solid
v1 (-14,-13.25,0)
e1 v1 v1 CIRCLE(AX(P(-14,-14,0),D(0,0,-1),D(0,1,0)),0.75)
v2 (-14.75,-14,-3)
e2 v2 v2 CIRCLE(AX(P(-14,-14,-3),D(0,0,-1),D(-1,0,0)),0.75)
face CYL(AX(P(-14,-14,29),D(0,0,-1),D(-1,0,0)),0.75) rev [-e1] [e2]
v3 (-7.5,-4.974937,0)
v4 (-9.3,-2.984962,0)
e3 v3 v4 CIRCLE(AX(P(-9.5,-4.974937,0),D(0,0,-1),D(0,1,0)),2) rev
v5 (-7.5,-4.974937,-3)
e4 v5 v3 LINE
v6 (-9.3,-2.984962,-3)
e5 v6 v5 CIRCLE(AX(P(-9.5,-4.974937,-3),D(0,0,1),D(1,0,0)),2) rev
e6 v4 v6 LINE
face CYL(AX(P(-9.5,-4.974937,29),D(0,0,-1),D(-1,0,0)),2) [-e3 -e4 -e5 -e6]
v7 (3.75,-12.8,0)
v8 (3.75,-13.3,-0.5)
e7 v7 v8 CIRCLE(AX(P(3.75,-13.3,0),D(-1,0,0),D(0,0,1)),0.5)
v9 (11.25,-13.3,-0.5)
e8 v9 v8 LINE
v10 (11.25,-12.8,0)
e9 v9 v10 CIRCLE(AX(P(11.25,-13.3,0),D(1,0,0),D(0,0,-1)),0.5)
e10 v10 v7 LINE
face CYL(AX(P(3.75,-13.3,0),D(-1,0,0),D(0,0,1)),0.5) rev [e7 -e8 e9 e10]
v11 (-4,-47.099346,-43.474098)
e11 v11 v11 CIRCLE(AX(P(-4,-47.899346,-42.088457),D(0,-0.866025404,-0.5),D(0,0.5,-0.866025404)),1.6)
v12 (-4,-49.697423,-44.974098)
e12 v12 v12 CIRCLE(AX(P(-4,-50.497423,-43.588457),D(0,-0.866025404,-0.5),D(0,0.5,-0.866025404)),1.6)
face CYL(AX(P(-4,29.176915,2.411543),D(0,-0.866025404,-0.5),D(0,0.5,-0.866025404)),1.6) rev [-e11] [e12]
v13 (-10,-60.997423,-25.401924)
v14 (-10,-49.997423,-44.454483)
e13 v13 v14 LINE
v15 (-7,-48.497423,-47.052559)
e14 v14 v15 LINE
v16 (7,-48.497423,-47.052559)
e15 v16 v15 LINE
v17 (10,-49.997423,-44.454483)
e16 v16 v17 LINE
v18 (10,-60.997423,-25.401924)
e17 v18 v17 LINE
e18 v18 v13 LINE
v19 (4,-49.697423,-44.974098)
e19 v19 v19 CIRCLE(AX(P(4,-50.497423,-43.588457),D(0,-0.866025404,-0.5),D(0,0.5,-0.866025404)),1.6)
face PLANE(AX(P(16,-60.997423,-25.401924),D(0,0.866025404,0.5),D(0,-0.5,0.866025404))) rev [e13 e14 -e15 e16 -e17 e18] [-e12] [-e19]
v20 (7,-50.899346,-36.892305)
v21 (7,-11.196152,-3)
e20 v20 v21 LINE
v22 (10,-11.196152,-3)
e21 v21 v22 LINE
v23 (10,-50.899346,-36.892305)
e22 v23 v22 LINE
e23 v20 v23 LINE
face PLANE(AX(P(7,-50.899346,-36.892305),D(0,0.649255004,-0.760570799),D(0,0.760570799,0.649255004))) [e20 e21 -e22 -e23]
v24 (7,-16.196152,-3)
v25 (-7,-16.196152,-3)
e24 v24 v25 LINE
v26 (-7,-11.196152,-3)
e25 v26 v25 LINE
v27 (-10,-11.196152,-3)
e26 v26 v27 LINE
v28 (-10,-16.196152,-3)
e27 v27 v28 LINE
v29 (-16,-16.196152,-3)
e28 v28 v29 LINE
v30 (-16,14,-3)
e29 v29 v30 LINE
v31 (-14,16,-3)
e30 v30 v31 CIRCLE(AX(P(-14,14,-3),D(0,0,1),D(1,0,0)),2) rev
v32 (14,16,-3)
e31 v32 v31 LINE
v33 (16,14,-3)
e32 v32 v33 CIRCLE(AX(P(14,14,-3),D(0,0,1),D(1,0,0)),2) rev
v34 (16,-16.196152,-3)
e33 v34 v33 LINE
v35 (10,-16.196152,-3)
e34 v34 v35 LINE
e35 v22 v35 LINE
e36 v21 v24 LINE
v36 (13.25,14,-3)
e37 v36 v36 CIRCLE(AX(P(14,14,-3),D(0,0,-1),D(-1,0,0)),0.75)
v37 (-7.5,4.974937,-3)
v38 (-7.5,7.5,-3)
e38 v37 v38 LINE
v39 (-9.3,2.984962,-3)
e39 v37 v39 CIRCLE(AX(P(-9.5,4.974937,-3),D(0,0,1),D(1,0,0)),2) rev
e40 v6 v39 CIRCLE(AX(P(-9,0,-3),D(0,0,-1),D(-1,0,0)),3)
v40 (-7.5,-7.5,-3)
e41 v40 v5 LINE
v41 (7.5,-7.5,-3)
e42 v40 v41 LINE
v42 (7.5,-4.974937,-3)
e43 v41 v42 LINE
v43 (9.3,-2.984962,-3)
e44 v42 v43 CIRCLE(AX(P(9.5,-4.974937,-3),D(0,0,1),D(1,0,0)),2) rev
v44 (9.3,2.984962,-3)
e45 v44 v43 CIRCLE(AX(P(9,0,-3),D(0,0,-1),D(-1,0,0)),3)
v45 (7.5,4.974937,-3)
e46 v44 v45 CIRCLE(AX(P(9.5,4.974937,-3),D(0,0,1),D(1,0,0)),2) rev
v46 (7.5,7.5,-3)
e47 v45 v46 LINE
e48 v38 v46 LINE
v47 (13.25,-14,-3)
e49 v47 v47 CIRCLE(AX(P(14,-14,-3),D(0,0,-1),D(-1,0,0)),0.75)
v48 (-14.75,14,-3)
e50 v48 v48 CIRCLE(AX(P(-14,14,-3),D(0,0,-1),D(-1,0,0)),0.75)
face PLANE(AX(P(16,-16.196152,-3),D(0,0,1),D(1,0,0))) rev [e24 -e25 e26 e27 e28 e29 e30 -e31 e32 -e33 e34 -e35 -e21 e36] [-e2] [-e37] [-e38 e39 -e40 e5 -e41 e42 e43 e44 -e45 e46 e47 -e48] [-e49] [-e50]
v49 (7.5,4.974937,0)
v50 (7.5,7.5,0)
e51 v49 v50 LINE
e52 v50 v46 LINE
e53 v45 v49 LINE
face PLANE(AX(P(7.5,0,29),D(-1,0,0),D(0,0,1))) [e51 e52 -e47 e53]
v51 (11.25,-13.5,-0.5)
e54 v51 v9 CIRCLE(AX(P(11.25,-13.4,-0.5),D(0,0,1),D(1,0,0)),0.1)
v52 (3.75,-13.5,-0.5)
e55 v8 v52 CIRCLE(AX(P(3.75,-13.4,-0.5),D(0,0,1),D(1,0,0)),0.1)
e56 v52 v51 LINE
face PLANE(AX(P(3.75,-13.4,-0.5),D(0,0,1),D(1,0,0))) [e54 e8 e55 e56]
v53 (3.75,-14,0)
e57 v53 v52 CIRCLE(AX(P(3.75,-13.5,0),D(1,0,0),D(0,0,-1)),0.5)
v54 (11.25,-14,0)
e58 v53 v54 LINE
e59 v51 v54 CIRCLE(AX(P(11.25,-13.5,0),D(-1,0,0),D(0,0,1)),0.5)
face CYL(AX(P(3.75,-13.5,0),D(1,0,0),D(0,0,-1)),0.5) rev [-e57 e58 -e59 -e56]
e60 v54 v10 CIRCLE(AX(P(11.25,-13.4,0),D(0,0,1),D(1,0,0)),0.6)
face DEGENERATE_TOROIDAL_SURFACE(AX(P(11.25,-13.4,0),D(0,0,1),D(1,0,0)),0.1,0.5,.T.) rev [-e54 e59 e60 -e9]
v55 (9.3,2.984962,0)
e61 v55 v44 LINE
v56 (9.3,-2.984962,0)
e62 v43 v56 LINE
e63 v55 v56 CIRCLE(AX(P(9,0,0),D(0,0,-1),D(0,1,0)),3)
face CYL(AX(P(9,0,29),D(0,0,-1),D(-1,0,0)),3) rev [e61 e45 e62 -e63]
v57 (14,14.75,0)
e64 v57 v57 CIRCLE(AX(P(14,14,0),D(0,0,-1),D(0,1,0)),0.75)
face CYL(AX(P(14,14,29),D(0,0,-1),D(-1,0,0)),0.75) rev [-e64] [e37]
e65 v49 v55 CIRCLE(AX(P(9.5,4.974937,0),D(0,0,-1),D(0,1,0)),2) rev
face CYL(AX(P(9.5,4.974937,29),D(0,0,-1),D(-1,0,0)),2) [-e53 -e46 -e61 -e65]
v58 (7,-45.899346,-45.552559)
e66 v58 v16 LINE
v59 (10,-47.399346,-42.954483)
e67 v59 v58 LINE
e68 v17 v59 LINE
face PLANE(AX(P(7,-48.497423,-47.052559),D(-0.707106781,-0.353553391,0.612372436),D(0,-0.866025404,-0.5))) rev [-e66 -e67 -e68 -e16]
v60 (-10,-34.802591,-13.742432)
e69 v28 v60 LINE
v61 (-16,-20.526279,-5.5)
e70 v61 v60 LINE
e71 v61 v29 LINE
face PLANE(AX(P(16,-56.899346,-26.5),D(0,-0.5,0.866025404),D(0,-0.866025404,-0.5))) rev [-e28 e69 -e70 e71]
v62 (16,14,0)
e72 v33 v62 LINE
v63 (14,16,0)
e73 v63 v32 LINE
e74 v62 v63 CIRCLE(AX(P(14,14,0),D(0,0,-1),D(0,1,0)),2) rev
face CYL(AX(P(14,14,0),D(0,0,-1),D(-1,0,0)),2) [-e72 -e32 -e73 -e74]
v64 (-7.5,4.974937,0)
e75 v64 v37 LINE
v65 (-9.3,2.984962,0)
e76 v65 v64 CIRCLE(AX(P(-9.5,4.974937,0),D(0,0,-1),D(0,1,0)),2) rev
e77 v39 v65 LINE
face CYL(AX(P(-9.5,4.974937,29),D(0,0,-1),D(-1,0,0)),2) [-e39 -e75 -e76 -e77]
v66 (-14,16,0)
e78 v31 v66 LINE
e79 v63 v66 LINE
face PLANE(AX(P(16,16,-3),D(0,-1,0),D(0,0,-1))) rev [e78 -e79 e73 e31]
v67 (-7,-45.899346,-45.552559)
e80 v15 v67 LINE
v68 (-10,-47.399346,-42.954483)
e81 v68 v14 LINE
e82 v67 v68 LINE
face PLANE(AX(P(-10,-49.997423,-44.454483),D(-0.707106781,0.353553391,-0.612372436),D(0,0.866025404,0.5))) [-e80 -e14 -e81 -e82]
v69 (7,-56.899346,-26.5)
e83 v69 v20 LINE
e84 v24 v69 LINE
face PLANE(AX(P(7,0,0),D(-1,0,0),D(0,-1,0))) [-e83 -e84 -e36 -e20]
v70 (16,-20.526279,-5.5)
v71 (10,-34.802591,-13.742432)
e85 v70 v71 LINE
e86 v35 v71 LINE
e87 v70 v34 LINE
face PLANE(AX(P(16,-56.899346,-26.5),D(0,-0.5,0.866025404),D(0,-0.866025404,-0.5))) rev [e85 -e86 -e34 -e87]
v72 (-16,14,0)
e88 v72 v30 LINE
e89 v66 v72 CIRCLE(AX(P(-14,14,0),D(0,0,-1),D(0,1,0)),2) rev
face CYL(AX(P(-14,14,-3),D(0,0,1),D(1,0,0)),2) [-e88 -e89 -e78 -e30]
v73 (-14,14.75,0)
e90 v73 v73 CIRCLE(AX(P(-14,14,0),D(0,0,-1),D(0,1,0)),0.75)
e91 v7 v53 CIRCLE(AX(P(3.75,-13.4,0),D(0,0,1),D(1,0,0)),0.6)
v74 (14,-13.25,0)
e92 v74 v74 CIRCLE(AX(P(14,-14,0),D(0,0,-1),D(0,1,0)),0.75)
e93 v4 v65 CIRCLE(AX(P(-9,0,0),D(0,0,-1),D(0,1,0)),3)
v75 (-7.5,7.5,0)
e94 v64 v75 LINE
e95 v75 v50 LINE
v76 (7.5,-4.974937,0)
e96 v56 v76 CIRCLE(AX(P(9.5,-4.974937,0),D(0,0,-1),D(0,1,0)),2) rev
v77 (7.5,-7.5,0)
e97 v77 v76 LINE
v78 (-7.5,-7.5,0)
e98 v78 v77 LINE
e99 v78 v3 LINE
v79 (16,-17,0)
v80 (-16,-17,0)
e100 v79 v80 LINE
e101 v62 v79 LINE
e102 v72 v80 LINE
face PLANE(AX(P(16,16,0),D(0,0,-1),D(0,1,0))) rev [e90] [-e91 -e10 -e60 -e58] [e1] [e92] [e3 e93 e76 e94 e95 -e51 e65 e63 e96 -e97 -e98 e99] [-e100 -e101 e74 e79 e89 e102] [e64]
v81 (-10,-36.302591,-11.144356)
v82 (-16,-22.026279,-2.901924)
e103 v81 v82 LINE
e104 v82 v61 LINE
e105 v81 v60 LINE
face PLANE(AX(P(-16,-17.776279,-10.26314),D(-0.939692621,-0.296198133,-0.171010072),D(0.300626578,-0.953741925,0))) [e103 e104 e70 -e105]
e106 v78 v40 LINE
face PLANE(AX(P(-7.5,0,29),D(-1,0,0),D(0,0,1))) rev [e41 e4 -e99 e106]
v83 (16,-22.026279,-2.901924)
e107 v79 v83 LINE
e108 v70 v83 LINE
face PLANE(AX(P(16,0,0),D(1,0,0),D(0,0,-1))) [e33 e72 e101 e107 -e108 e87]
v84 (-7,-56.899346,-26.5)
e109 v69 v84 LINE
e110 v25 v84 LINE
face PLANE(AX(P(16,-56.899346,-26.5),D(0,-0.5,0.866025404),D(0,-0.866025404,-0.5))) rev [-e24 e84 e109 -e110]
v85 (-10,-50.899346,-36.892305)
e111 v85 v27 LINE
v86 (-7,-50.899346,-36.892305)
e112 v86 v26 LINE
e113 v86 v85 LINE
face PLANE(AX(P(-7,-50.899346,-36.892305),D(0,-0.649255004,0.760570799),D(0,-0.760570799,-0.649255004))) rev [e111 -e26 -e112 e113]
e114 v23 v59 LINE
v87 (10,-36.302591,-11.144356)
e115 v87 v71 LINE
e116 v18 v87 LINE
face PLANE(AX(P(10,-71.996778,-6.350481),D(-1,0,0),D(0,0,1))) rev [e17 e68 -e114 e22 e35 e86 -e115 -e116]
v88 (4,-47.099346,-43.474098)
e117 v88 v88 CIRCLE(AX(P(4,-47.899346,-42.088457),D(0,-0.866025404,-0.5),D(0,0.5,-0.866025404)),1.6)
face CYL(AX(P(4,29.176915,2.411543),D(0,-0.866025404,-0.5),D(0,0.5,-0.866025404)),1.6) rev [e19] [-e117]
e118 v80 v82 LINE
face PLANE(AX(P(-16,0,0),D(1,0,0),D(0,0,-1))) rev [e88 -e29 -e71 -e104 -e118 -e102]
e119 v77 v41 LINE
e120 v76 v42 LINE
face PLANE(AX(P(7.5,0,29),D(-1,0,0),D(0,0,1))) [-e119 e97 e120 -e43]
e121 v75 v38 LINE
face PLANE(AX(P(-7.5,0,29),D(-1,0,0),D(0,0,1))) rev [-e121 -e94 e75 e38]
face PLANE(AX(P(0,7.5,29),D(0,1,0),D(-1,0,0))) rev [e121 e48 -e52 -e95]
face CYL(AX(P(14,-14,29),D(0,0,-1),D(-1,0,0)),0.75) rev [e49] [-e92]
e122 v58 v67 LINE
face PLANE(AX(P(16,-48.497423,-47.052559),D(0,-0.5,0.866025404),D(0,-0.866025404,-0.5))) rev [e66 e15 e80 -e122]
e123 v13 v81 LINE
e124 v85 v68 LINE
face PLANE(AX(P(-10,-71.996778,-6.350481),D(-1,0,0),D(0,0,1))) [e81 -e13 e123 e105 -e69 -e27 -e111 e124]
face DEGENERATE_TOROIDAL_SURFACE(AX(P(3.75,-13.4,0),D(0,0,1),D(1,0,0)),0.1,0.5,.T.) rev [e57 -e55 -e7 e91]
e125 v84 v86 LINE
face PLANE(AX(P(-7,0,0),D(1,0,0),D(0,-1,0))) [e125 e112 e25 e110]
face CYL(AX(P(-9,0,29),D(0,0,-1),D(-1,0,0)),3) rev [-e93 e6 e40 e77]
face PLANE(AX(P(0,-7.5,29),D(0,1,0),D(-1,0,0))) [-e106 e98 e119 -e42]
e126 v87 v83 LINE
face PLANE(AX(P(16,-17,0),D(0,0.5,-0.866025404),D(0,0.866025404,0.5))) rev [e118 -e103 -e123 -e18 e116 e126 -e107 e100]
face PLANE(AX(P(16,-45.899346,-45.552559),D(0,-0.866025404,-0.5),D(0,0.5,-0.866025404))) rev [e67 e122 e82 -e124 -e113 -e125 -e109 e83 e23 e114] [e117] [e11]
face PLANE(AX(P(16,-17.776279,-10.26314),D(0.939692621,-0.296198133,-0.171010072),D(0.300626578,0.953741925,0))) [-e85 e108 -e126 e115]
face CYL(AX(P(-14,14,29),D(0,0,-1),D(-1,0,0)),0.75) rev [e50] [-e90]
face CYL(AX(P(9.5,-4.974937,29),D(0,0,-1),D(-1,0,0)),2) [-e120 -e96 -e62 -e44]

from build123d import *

# Parameters (mm, degrees)
BOSS_EXTRUDE1_DEPTH = 16
FILLET1_R           = 2
SKETCH2_W           = 15
SKETCH2_H           = 4.5
SKETCH2_H_2         = 6
SKETCH2_R           = 0.75
CUT_EXTRUDE1_DEPTH  = 32
SKETCH4_R           = 1.6
CUT_EXTRUDE2_DEPTH  = 92
CUT_EXTRUDE4_DEPTH  = 80.584099309
BOSS_EXTRUDE2_DEPTH = 3
DRAFT1_ANGLE        = 70
DRAFT2_START        = -8.5
DRAFT2_DEPTH        = 3
CUT_EXTRUDE5_DEPTH  = 0.5
FILLET4_R           = 0.5
FILLET3_R           = 2
CHAMFER1_SIZE       = 3


# Read off the part's stored shape, not the designer's step: Draft2
with BuildPart() as part:
    # Sketch1 → Boss-Extrude1 (new, symmetric)
    with BuildSketch(Plane(origin=(0, 0, 0), x_dir=(0, 0, -1), z_dir=(1, 0, 0))):
        Polygon((0, 16), (0, -17), (25.401923789, -60.997422612), (47.052558883, -48.497422612), (45.552558883, -45.899346401), (26.5, -56.899346401), (3, -16.196152423), (3, 16), align=None)
    extrude(amount=BOSS_EXTRUDE1_DEPTH, both=True)

    # Fillet1
    fillet1_edges = [part.edges().sort_by_distance(p)[0] for p in [
        (-16, 16, -1.5),
        (16, 16, -1.5),
    ]]
    fillet(fillet1_edges, radius=FILLET1_R)

    # Sketch2 → Cut-Extrude1 (cut)
    with BuildSketch(Plane(origin=(0, 0, -3), x_dir=(-1, 0, 0), z_dir=(0, 0, -1))):
        with Locations((0, 5.25)):
            Rectangle(SKETCH2_W, SKETCH2_H)
        Rectangle(SKETCH2_W, SKETCH2_H_2)
        with BuildLine():
            Line((-9, -3), (-7.5, -3))
            Line((-7.5, -3), (-7.5, 3))
            Line((-7.5, 3), (-9, 3))
            ThreePointArc((-9, 3), (-12, 0), (-9, -3))
        make_face()
        with Locations((0, -5.25)):
            Rectangle(SKETCH2_W, SKETCH2_H)
        with BuildLine():
            Line((7.5, 3), (7.5, -3))
            Line((7.5, -3), (9, -3))
            ThreePointArc((9, -3), (12, 0), (9, 3))
            Line((9, 3), (7.5, 3))
        make_face()
        with Locations((14, -14)):
            Circle(SKETCH2_R)
        with Locations((-14, -14)):
            Circle(SKETCH2_R)
        with Locations((-14, 14)):
            Circle(SKETCH2_R)
        with Locations((14, 14)):
            Circle(SKETCH2_R)
    extrude(amount=-CUT_EXTRUDE1_DEPTH, mode=Mode.SUBTRACT)

    # Sketch4 → Cut-Extrude2 (cut)
    with BuildSketch(Plane(origin=(0, -56.747422612, -32.763139721), x_dir=(1, 0, 0), z_dir=(0, -0.8660254037844379, -0.5000000000000014))):
        with Locations(Location((-4, -12.5, 0), (0, 0, 270))):
            Circle(SKETCH4_R)
        with Locations(Location((4, -12.5, 0), (0, 0, 270))):
            Circle(SKETCH4_R)
    extrude(amount=-CUT_EXTRUDE2_DEPTH, mode=Mode.SUBTRACT)

    # Sketch7 → Cut-Extrude4 (cut, symmetric)
    with BuildSketch(Plane(origin=(0, -2.75, 4.763139721), x_dir=(-1, 0, 0), z_dir=(0, 0.500000000000002, -0.8660254037844375))):
        Polygon((-10, -65.526279442), (-10, -26.526279442), (-16, -20.526279442), (-16, -65.526279442), align=None)
    cut_extrude4 = extrude(amount=CUT_EXTRUDE4_DEPTH, both=True, mode=Mode.SUBTRACT)

    # Sketch5 → Boss-Extrude2 (add)
    with BuildSketch(Plane(origin=(10, 0, 0), x_dir=(0, 0, -1), z_dir=(1, 0, 0))):
        Polygon((36.892304845, -50.899346401), (3, -11.196152423), (3, -16.196152423), (26.5, -56.899346401), align=None)
    boss_extrude2 = extrude(amount=-BOSS_EXTRUDE2_DEPTH)

    # Draft1
    draft1_faces = [part.faces().sort_by_distance(p)[0] for p in [
        (13, -23.874355653, -5.700961894),
    ]]
    draft(draft1_faces, Plane(origin=(16, 0, 0), x_dir=(0, 0, 1), z_dir=(1, 0, 0)), DRAFT1_ANGLE)

    # Mirror2: Cut-Extrude4, Boss-Extrude2 across plane
    add(cut_extrude4.mirror(Plane(origin=(0, 0, 0), x_dir=(0, 0, 1), z_dir=(1, 0, 0))), mode=Mode.SUBTRACT)
    add(boss_extrude2.mirror(Plane(origin=(0, 0, 0), x_dir=(0, 0, 1), z_dir=(1, 0, 0))))

    # Draft2 outline → Draft2 (add)
    with BuildSketch(Plane(origin=(0, 0, 0), x_dir=(1, 0, 0), z_dir=(0, 0.5000000000000018, -0.8660254037844377)).offset(DRAFT2_START)):
        Polygon((-10, 26.526279442), (-10, 37.011143958), (-16, 20.526279442), align=None)
    extrude(amount=DRAFT2_DEPTH)

    # Sketch8 → Cut-Extrude5 (cut)
    with BuildSketch(Plane.XY):
        with BuildLine():
            Line((3.75, -12.8), (11.25, -12.8))
            ThreePointArc((11.25, -12.8), (11.85, -13.4), (11.25, -14))
            Line((11.25, -14), (3.75, -14))
            ThreePointArc((3.75, -14), (3.15, -13.4), (3.75, -12.8))
        make_face()
    extrude(amount=-CUT_EXTRUDE5_DEPTH, mode=Mode.SUBTRACT)

    # Fillet4
    fillet4_edges = [part.edges().sort_by_distance(p)[0] for p in [
        (7.5, -12.8, -0.5),
        (11.85, -13.4, -0.5),
        (7.5, -14, -0.5),
        (3.15, -13.4, -0.5),
    ]]
    fillet(fillet4_edges, radius=FILLET4_R - 0.0001)  # a hair under: the kernel refuses the full size

    # Fillet3
    fillet3_edges = [part.edges().sort_by_distance(p)[0] for p in [
        (-7.5, 3, -1.5),
        (-7.5, -3, -1.5),
        (7.5, -3, -1.5),
        (7.5, 3, -1.5),
    ]]
    fillet(fillet3_edges, radius=FILLET3_R)

    # Chamfer1
    chamfer1_edges = [part.edges().sort_by_distance(p)[0] for p in [
        (10, -47.198384506, -46.302558883),
        (-10, -47.198384506, -46.302558883),
    ]]
    chamfer(chamfer1_edges, length=CHAMFER1_SIZE)


solid = part.part
